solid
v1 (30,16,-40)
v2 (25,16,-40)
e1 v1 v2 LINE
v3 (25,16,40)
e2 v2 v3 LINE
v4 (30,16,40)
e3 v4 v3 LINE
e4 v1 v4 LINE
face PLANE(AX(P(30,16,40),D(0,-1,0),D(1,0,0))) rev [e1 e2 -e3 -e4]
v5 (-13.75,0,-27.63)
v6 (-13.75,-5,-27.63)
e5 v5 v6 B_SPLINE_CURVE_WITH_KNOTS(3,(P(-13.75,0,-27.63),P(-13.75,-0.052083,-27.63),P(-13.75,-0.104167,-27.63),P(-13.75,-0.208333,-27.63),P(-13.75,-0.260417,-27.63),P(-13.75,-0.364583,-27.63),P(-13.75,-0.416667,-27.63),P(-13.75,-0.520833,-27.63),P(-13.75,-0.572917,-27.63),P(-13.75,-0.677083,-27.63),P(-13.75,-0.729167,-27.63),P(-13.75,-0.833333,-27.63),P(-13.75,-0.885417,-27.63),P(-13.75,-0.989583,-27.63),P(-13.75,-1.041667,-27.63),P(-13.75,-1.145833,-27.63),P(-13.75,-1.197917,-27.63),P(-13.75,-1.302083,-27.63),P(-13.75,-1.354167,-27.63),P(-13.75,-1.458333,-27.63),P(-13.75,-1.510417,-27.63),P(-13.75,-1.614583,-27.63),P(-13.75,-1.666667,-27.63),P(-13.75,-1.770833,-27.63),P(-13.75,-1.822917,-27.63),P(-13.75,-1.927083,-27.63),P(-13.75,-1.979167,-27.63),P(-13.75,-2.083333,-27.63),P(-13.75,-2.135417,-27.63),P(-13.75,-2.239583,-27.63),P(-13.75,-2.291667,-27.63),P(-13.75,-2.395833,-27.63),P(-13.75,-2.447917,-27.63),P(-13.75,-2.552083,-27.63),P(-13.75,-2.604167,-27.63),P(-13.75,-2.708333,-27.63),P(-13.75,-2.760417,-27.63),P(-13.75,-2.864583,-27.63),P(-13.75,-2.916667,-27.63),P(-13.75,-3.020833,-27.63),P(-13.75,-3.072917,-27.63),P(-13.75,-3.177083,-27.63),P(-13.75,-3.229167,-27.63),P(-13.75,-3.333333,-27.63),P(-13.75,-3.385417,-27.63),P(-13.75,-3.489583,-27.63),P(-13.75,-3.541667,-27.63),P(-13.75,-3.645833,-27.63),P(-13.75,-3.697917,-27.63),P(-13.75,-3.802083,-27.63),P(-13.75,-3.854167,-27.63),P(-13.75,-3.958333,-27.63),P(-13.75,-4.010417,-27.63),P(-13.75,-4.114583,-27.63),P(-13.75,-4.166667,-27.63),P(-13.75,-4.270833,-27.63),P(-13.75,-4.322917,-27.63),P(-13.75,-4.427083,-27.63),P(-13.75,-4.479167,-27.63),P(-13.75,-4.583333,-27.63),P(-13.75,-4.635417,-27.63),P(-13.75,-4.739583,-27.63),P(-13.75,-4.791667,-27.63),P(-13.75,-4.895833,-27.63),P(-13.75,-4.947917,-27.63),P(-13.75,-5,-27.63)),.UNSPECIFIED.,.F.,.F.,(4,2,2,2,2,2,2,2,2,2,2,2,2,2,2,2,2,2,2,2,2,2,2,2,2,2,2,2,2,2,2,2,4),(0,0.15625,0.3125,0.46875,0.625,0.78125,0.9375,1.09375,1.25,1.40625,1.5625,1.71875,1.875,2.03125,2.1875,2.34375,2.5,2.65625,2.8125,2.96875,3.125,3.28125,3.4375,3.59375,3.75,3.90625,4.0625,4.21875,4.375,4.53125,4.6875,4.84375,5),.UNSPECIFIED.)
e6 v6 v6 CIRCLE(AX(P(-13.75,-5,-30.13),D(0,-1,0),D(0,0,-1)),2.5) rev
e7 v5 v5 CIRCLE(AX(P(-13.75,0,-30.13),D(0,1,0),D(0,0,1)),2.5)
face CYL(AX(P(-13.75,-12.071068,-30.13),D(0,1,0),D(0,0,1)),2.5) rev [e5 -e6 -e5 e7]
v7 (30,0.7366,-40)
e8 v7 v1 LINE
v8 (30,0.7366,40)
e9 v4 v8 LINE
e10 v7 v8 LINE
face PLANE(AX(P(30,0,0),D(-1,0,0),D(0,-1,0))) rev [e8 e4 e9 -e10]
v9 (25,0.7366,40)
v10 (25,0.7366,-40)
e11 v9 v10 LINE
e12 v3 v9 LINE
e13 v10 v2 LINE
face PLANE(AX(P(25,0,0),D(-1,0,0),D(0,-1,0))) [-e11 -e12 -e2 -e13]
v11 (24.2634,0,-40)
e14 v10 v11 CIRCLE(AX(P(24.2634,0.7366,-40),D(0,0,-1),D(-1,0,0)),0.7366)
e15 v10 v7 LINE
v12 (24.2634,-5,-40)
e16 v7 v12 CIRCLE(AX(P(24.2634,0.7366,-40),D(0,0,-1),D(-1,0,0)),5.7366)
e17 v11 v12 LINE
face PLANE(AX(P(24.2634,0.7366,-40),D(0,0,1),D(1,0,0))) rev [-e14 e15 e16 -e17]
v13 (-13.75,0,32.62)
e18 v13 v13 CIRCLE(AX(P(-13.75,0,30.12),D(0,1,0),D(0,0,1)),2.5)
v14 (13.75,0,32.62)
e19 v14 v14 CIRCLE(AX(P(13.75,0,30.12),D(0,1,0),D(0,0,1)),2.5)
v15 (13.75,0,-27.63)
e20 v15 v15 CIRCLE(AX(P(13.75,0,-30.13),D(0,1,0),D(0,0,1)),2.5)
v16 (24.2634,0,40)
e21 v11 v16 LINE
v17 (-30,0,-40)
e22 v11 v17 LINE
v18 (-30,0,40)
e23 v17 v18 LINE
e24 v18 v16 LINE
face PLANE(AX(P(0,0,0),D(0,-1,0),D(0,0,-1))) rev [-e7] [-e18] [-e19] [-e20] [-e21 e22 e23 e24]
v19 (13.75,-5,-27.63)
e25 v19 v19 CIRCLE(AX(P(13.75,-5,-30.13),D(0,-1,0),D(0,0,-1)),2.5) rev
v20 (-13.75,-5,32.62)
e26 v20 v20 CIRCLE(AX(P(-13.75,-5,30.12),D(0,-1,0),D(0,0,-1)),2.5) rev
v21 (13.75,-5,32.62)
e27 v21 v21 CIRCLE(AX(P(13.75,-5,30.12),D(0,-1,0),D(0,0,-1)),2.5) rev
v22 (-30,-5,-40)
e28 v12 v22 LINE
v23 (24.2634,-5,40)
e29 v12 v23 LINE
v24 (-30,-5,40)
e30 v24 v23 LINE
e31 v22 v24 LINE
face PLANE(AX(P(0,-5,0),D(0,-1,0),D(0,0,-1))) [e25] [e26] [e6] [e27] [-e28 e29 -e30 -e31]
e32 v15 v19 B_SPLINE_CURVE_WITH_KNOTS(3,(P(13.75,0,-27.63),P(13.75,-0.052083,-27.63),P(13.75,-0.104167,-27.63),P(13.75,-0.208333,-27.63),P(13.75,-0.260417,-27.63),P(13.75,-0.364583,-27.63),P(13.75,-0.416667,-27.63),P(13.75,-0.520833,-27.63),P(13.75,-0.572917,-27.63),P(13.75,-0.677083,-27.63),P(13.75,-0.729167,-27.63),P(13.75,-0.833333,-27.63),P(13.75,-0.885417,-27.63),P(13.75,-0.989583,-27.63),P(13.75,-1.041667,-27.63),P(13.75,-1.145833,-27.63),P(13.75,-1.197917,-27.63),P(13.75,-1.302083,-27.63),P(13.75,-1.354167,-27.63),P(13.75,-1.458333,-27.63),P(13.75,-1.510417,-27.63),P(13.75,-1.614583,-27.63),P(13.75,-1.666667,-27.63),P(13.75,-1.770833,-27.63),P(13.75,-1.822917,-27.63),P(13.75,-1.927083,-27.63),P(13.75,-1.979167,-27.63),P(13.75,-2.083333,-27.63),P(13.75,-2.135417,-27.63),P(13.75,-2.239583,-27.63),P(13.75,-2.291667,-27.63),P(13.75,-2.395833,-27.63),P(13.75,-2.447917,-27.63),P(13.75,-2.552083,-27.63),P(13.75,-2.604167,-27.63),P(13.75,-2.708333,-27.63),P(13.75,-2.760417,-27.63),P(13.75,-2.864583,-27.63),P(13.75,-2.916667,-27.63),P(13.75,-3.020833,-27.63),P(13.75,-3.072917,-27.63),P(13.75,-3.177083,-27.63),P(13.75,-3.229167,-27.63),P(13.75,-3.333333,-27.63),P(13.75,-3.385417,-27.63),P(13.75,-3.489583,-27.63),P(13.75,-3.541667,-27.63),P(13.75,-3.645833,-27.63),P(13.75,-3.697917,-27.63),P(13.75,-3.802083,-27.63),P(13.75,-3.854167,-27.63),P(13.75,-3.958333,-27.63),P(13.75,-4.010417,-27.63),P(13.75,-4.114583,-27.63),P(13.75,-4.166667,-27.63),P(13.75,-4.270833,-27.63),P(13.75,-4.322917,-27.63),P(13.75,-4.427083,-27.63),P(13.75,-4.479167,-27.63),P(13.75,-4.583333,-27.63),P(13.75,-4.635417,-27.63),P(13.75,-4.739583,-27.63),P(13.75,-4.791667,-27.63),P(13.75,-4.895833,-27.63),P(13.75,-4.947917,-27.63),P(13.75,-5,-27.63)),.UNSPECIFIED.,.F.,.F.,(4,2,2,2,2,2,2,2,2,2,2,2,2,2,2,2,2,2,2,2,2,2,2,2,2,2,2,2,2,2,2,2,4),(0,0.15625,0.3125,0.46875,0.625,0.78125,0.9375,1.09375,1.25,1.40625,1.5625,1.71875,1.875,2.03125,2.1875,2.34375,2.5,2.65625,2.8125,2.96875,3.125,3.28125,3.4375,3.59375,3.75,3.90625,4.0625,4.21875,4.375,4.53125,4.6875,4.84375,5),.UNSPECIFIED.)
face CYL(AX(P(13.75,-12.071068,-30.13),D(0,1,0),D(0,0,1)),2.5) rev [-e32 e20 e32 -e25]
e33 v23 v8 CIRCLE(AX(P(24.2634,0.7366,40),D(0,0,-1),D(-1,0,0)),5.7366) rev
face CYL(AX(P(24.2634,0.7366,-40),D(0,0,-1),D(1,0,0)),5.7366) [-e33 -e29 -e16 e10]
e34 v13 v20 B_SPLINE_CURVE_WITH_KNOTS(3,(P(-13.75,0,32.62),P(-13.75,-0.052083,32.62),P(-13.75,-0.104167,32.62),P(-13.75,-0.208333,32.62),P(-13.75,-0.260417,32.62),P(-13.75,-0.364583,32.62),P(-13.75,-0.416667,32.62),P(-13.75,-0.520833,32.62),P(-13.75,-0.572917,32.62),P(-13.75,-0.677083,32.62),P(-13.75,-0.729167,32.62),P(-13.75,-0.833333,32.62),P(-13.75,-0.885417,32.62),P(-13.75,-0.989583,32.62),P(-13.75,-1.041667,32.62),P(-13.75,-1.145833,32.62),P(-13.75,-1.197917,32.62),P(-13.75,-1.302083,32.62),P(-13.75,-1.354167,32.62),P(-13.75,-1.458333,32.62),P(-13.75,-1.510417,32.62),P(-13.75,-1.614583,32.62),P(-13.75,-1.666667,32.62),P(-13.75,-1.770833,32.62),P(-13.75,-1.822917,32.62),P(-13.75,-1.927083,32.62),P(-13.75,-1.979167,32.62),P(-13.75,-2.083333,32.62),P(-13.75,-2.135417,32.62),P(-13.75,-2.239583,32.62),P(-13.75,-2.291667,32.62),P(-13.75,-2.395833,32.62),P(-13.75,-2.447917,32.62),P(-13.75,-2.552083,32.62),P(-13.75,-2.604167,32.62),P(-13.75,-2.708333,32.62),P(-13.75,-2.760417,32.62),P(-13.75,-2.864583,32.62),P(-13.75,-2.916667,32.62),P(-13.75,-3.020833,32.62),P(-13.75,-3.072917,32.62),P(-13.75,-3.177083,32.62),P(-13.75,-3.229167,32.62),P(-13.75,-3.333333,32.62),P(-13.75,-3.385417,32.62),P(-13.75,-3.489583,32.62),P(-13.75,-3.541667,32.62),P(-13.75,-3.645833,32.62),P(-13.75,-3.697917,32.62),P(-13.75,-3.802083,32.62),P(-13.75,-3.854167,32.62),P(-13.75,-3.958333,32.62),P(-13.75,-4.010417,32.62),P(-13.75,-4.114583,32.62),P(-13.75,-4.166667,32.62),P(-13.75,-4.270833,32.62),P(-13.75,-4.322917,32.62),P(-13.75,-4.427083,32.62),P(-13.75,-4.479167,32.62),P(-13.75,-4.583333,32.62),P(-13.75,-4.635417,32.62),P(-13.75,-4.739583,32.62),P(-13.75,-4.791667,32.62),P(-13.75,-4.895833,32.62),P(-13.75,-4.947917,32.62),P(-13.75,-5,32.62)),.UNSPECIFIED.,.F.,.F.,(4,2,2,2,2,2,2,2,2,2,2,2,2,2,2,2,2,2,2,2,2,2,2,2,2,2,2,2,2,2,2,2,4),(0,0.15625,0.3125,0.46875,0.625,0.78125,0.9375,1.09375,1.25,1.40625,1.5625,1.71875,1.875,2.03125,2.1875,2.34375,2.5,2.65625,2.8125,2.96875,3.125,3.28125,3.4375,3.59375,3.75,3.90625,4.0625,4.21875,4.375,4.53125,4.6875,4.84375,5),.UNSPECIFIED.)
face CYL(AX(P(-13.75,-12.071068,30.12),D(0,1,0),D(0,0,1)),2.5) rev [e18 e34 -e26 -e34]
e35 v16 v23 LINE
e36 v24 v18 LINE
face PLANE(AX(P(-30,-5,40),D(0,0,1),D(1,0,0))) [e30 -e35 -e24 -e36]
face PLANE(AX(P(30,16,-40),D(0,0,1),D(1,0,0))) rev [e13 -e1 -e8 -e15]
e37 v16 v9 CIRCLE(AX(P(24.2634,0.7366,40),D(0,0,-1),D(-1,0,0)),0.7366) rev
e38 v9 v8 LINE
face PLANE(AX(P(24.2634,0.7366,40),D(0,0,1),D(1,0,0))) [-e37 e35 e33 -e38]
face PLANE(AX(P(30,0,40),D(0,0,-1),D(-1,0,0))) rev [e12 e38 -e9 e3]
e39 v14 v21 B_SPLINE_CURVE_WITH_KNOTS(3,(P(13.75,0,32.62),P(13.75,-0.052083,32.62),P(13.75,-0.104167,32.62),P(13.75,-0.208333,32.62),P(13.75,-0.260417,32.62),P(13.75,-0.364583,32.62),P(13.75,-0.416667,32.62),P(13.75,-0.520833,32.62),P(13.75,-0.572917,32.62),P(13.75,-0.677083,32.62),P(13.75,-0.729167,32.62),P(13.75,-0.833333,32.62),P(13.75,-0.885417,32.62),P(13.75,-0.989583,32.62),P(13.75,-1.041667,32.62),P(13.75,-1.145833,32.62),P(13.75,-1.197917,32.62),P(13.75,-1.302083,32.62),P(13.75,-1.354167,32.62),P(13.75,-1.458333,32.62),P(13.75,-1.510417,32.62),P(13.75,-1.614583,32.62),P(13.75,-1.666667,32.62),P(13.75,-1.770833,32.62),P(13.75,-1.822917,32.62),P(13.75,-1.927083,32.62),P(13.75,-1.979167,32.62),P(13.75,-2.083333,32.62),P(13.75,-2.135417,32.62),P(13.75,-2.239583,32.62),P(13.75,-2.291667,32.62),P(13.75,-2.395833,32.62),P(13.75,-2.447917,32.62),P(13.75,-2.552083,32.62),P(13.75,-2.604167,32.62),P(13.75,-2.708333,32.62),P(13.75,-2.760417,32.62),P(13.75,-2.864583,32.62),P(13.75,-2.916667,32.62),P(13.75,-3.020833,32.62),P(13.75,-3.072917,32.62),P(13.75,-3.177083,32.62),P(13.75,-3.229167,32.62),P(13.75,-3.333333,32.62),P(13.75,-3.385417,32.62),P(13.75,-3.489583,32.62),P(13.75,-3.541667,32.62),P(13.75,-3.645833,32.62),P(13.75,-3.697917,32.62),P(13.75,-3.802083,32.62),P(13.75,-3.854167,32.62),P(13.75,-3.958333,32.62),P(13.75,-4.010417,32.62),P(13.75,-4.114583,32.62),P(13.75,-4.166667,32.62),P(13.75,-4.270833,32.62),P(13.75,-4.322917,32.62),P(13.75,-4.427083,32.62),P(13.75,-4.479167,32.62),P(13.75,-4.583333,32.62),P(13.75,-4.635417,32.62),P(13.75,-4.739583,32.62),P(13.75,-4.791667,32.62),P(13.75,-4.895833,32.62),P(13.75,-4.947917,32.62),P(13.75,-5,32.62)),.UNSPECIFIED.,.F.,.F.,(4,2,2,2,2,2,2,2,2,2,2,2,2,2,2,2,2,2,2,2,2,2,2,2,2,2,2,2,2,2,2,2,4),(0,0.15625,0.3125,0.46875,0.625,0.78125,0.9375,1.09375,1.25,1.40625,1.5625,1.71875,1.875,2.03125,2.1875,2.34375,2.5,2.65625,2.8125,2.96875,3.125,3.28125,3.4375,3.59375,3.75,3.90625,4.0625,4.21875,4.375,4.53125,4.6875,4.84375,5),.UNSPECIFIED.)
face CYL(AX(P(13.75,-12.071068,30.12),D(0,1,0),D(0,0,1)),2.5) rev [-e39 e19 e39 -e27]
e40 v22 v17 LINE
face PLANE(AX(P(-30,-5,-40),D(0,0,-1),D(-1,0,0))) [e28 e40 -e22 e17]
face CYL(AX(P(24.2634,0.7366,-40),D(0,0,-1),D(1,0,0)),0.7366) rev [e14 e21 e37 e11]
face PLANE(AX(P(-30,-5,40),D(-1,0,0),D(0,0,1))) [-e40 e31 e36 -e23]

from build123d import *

# Parameters (mm, degrees)
CROQUIS1_W                       = 60
CROQUIS1_H                       = 80
BRIDA_BASE1_DEPTH                = 5
BRIDA_DE_ARISTA1_STRIP_W         = 21.4732
BRIDA_DE_ARISTA1_STRIP_H         = 5
BRIDA_DE_ARISTA1_STRIP_CUT_DEPTH = 80
BRIDA_DE_ARISTA1_DEPTH           = 80
CROQUIS9_R                       = 2.5
CORTAR_EXTRUIR1_DEPTH            = 5


# Sheet-metal steps are written as plain solids
with BuildPart() as part:
    # Croquis1 → Brida base1 (new body)
    with BuildSketch(Plane(origin=(0, 0, 0), x_dir=(1, 0, 0), z_dir=(0, 1, 0))):
        Rectangle(CROQUIS1_W, CROQUIS1_H)
    extrude(amount=-BRIDA_BASE1_DEPTH)

    # Brida de arista1 strip (across the edge) → Brida de arista1 strip cut (cut)
    with BuildSketch(Plane(origin=(30, 0, 40), x_dir=(-1, 0, 0), z_dir=(0, 0, -1))):
        with Locations((-5, -2.5)):
            Rectangle(BRIDA_DE_ARISTA1_STRIP_W, BRIDA_DE_ARISTA1_STRIP_H)
    extrude(amount=BRIDA_DE_ARISTA1_STRIP_CUT_DEPTH, mode=Mode.SUBTRACT)

    # Brida de arista1 section (across the edge) → Brida de arista1 (add)
    with BuildSketch(Plane(origin=(30, 0, 40), x_dir=(-1, 0, 0), z_dir=(0, 0, -1))):
        with BuildLine():
            Line((0, 0.7366), (0, 16))
            Line((0, 16), (5, 16))
            Line((5, 16), (5, 0.7366))
            ThreePointArc((5, 0.7366), (5.215745145, 0.215745145), (5.7366, 0))
            Line((5.7366, 0), (5.7366, -5))
            ThreePointArc((5.7366, -5), (1.680211239, -3.319788761), (0, 0.7366))
        make_face()
    extrude(amount=BRIDA_DE_ARISTA1_DEPTH)

    # Croquis9 → Cortar-Extruir1 (cut)
    with BuildSketch(Plane(origin=(0, 0, 0), x_dir=(1, 0, 0), z_dir=(0, 1, 0))):
        with Locations(Location((-13.75, 30.13, 0), (0, 0, 270))):
            Circle(CROQUIS9_R)
        with Locations(Location((13.75, 30.13, 0), (0, 0, 270))):
            Circle(CROQUIS9_R)
        with Locations(Location((13.75, -30.12, 0), (0, 0, 270))):
            Circle(CROQUIS9_R)
        with Locations(Location((-13.75, -30.12, 0), (0, 0, 270))):
            Circle(CROQUIS9_R)
    extrude(amount=-CORTAR_EXTRUIR1_DEPTH, mode=Mode.SUBTRACT)


solid = part.part
